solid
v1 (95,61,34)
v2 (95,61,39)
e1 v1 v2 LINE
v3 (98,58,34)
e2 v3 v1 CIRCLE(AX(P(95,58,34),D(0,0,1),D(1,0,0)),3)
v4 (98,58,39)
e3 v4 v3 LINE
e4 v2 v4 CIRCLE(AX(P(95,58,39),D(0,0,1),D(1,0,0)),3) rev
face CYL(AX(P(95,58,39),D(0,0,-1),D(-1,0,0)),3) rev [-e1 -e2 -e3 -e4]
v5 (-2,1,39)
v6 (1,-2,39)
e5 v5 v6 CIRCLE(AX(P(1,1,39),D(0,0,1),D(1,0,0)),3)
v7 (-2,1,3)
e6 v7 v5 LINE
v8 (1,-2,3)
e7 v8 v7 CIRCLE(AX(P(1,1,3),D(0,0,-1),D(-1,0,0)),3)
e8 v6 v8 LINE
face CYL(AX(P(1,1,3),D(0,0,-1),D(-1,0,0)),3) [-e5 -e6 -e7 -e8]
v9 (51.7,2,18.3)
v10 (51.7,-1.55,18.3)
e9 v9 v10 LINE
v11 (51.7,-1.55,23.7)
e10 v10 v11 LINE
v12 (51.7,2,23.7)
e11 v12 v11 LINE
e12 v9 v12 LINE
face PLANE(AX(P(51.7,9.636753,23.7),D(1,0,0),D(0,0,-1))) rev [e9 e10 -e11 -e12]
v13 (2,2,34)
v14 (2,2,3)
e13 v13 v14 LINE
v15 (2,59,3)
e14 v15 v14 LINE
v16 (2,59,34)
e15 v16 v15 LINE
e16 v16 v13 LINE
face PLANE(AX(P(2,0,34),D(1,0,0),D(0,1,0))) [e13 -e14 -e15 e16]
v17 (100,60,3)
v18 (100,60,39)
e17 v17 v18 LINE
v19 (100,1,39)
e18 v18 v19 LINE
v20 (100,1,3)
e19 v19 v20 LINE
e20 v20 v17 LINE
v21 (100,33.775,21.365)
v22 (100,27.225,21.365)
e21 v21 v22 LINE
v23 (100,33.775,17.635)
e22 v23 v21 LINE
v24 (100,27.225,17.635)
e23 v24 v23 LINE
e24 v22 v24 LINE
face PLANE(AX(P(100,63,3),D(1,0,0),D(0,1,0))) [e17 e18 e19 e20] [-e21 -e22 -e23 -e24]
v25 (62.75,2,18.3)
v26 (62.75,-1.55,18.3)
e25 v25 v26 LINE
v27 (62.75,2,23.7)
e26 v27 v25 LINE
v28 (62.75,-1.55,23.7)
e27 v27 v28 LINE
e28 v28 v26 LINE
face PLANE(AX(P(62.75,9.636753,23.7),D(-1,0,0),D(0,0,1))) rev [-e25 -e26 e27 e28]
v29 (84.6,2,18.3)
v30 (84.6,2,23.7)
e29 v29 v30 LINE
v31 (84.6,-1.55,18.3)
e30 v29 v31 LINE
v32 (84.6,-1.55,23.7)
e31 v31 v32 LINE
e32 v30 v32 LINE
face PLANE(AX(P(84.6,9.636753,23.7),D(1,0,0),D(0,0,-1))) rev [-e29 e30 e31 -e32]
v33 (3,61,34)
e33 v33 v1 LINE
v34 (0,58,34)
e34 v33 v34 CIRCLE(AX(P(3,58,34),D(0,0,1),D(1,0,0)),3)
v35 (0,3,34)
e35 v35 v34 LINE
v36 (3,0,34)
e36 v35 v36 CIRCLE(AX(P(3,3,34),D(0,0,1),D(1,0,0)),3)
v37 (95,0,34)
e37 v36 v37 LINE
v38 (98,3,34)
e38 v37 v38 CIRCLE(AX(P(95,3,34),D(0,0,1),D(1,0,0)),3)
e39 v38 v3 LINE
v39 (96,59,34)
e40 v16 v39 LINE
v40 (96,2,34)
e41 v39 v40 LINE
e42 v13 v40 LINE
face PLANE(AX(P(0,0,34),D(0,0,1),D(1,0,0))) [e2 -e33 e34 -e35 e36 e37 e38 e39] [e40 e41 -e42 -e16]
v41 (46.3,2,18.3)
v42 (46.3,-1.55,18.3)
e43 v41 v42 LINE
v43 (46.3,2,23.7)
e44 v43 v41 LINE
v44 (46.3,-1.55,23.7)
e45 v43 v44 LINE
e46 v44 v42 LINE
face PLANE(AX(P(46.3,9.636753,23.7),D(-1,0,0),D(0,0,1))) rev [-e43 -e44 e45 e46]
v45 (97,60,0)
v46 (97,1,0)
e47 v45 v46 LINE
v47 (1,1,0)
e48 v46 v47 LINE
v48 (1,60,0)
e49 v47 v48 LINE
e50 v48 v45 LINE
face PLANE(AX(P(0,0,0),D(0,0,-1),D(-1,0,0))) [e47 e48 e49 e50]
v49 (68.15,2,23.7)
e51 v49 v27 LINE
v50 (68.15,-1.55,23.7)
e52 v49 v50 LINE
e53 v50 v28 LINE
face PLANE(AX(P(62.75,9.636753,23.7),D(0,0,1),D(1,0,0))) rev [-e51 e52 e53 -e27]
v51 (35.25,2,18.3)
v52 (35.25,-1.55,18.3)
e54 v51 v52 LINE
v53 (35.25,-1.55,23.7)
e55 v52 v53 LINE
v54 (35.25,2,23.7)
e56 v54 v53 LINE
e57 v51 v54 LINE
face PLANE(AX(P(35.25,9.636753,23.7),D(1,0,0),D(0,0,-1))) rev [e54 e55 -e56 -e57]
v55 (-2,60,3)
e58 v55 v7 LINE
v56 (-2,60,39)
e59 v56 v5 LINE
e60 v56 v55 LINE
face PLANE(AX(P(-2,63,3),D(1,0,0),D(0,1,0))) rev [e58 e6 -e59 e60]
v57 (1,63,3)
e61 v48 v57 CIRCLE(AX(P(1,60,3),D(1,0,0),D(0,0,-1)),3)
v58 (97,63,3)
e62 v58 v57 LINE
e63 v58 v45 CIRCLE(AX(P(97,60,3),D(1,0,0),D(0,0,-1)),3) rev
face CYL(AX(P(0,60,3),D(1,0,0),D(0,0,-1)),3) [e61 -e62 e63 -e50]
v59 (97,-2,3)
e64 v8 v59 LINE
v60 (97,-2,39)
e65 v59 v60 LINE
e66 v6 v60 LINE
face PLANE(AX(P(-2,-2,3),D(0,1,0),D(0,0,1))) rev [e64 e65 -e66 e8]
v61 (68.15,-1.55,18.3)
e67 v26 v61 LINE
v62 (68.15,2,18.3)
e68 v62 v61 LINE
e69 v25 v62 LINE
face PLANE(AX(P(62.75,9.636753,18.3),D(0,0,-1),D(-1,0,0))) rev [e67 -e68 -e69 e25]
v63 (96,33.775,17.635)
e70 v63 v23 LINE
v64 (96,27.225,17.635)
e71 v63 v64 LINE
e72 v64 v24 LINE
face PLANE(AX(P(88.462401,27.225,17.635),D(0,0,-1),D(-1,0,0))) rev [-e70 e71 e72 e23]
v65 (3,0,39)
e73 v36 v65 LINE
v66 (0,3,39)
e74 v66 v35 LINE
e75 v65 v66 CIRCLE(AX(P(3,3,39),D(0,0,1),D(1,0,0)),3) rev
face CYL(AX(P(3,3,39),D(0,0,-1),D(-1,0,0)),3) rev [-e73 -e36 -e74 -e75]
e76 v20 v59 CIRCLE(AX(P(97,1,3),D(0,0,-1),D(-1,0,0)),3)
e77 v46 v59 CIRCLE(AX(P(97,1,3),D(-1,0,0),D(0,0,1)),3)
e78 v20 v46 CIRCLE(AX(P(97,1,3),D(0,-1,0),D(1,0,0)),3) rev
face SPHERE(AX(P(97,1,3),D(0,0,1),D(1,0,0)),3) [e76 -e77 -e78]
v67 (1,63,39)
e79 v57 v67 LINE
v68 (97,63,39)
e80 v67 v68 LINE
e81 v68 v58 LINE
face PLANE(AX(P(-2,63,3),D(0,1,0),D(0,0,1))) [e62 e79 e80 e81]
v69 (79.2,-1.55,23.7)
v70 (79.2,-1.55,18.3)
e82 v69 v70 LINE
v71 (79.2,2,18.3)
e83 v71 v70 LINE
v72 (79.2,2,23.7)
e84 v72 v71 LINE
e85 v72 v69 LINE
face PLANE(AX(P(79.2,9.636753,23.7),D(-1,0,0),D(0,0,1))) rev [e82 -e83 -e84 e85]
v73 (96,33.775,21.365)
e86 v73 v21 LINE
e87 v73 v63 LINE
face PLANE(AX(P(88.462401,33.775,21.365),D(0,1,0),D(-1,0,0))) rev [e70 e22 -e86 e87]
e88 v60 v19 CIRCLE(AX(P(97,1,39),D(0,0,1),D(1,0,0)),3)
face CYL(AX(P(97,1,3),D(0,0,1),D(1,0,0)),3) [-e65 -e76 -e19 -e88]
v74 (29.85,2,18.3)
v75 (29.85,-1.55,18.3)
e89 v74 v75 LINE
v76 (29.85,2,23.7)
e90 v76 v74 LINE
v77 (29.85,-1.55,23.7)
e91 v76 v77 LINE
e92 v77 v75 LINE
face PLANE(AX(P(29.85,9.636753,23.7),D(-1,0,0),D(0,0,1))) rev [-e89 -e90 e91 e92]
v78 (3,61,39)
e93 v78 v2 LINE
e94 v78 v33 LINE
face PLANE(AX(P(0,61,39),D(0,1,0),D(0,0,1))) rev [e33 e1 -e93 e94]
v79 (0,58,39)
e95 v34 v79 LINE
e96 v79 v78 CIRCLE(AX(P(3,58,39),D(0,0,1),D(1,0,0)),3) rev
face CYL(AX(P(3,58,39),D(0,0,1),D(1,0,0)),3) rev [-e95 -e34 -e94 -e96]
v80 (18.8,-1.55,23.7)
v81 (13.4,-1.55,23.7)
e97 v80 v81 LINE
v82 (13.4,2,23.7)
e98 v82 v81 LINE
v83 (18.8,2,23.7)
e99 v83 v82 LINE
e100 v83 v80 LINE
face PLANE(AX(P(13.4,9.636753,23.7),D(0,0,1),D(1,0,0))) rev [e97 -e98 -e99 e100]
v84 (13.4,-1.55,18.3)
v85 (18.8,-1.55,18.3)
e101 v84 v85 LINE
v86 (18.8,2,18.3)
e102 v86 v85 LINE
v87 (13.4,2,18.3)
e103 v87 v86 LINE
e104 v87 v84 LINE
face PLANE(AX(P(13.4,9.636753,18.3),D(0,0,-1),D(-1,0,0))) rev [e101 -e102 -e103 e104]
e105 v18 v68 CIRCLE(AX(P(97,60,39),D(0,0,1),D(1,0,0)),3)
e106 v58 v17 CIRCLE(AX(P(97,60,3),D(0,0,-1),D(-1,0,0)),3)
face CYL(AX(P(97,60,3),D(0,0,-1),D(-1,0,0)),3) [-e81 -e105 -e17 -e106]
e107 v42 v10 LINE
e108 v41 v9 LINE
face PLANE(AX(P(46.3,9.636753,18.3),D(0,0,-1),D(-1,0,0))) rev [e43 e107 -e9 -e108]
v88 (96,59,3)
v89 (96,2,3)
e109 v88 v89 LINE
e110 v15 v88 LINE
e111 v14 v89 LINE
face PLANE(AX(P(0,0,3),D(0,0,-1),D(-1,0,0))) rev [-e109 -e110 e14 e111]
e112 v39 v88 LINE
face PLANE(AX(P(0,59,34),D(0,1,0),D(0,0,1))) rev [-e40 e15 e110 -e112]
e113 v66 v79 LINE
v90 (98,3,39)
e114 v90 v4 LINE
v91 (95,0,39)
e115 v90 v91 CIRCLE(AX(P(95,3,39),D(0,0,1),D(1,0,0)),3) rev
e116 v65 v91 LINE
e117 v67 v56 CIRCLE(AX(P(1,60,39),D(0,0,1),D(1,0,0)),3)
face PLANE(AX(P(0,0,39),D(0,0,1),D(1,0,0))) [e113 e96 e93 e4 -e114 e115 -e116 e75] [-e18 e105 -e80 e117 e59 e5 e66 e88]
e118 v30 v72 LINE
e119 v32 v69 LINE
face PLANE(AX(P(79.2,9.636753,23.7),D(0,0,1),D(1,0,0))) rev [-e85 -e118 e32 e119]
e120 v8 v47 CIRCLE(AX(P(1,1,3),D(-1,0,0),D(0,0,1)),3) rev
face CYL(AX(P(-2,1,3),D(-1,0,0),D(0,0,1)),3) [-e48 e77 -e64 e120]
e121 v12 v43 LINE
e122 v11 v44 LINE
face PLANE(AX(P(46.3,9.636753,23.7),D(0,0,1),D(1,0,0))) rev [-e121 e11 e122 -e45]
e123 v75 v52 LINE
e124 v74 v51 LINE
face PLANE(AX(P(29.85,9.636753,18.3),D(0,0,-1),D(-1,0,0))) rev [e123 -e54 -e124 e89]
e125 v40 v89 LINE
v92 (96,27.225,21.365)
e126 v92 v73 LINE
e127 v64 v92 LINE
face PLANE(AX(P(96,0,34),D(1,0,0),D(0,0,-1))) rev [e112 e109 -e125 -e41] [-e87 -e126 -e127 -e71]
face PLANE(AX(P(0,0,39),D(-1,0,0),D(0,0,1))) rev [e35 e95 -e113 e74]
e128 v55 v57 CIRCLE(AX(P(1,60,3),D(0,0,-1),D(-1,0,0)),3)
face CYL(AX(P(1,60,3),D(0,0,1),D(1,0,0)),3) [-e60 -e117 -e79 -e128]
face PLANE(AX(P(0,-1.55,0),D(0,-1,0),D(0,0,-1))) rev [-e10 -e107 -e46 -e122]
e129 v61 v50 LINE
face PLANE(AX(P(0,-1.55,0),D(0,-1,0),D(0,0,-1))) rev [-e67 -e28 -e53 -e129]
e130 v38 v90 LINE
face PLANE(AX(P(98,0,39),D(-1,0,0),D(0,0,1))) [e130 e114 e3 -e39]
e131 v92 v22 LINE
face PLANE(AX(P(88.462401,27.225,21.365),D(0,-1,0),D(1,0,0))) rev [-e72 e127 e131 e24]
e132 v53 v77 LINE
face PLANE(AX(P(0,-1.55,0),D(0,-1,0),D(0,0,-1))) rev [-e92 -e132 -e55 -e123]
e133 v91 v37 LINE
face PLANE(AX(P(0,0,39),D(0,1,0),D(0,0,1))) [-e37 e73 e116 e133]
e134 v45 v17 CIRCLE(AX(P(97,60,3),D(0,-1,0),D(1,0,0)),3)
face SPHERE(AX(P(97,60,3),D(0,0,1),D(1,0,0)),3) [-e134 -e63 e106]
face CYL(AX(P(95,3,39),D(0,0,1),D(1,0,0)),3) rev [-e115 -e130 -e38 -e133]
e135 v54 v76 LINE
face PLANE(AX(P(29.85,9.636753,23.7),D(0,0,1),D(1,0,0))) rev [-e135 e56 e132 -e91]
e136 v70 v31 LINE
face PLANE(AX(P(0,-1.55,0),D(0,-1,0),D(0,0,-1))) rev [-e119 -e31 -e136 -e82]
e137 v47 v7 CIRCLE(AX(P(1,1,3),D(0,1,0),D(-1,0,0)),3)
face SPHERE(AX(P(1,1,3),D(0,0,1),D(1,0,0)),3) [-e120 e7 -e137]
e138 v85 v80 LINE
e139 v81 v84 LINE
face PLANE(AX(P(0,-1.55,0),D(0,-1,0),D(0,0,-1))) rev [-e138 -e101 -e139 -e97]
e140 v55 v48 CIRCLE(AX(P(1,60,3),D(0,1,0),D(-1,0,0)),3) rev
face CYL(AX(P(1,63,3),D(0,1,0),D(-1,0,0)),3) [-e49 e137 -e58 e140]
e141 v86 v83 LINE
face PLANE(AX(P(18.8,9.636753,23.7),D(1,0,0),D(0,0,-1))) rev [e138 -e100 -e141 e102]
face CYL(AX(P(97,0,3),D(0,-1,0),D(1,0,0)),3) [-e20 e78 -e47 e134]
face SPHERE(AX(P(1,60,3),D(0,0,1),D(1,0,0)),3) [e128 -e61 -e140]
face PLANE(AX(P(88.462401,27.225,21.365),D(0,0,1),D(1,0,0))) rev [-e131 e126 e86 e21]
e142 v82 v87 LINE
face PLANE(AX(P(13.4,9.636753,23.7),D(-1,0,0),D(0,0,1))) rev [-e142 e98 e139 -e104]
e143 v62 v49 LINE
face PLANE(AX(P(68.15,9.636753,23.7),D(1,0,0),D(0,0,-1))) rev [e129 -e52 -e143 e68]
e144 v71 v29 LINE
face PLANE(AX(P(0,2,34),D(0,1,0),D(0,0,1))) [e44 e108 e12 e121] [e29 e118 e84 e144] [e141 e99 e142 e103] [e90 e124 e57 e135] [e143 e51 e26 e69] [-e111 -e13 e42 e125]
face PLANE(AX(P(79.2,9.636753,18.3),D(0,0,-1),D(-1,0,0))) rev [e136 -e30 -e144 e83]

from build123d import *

# Parameters (mm, degrees)
SKICA1_W                 = 102
SKICA1_H                 = 65
P_IDAT_VYSUNUT_M1_DEPTH  = 3
SKICA1_4_W               = 102
SKICA1_4_H               = 65
SKICA1_4_W_2             = 98
SKICA1_4_H_2             = 61
P_IDAT_VYSUNUT_M2_DEPTH  = 39
SKICA1_5_W               = 98
SKICA1_5_H               = 61
SKICA1_5_W_2             = 94
SKICA1_5_H_2             = 57
P_IDAT_VYSUNUT_M3_DEPTH  = 34
SKICA2_W                 = 3.73
SKICA2_H                 = 6.55
ODEBRAT_VYSUNUT_M1_DEPTH = 4
ZAOBLIT1_R               = 3
ZAOBLIT2_R               = 3
ODEBRAT_START            = -0.45
SKICA4_W                 = 5.4
SKICA4_H                 = 5.4
ODEBRAT_VYSUNUT_M2_DEPTH = 3.55
ZAOBLIT3_R               = 3


with BuildPart() as part:
    # Skica1 → Přidat vysunutím1 (new body)
    with BuildSketch(Plane.XY):
        with Locations((49, 30.5)):
            Rectangle(SKICA1_W, SKICA1_H)
    extrude(amount=P_IDAT_VYSUNUT_M1_DEPTH)

    # Skica1<4> → Přidat vysunutím2 (add)
    with BuildSketch(Plane.XY):
        with Locations((49, 30.5)):
            Rectangle(SKICA1_4_W, SKICA1_4_H)
        with Locations((49, 30.5)):
            Rectangle(SKICA1_4_W_2, SKICA1_4_H_2, mode=Mode.SUBTRACT)
    extrude(amount=P_IDAT_VYSUNUT_M2_DEPTH)

    # Skica1<5> → Přidat vysunutím3 (add)
    with BuildSketch(Plane.XY):
        with Locations((49, 30.5)):
            Rectangle(SKICA1_5_W, SKICA1_5_H)
        with Locations((49, 30.5)):
            Rectangle(SKICA1_5_W_2, SKICA1_5_H_2, mode=Mode.SUBTRACT)
    extrude(amount=P_IDAT_VYSUNUT_M3_DEPTH)

    # Skica2 → Odebrat vysunutím1 (cut)
    with BuildSketch(Plane(origin=(100, 0, 0), x_dir=(0, 0, -1), z_dir=(1, 0, 0))):
        with Locations((-19.5, 30.5)):
            Rectangle(SKICA2_W, SKICA2_H)
    extrude(amount=-ODEBRAT_VYSUNUT_M1_DEPTH, mode=Mode.SUBTRACT)

    # Zaoblit1
    zaoblit1_edges = [part.edges().sort_by_distance(p)[0] for p in [
        (-2, 30.5, 0),
        (49, -2, 0),
        (100, 30.5, 0),
        (49, 63, 0),
    ]]
    fillet(zaoblit1_edges, radius=ZAOBLIT1_R)

    # Zaoblit2
    # the kernel refuses this fillet: 3 mm, written as the material it takes off along each edge
    with BuildSketch(Plane(origin=(97, 60, 3), x_dir=(1, 0, 0), z_dir=(0, 1, 0))) as zaoblit2_piece_1_section:
        Polygon((0, 0), (ZAOBLIT2_R, 0), (ZAOBLIT2_R, ZAOBLIT2_R), (0, ZAOBLIT2_R), align=None)
    zaoblit2_piece_1 = extrude(amount=ZAOBLIT2_R, mode=Mode.PRIVATE)
    zaoblit2_piece_1 = zaoblit2_piece_1 - Plane(origin=(97, 60, 3), x_dir=(-0.7071067811865475, 0, 0.7071067811865475), z_dir=(0, 1, 0)) * Sphere(ZAOBLIT2_R, mode=Mode.PRIVATE)
    add(zaoblit2_piece_1, mode=Mode.SUBTRACT)
    with BuildSketch(Plane(origin=(97, 1, 3), x_dir=(0, -1, 0), z_dir=(1, 0, 0))) as zaoblit2_piece_2_section:
        Polygon((0, 0), (ZAOBLIT2_R, 0), (ZAOBLIT2_R, ZAOBLIT2_R), (0, ZAOBLIT2_R), align=None)
    zaoblit2_piece_2 = extrude(amount=ZAOBLIT2_R, mode=Mode.PRIVATE)
    zaoblit2_piece_2 = zaoblit2_piece_2 - Plane(origin=(97, 1, 3), x_dir=(0, 0.7071067811865475, 0.7071067811865475), z_dir=(1, 0, 0)) * Sphere(ZAOBLIT2_R, mode=Mode.PRIVATE)
    add(zaoblit2_piece_2, mode=Mode.SUBTRACT)
    with BuildSketch(Plane(origin=(1, 60, 3), x_dir=(-1, 0, 0), z_dir=(0, 1, 0))) as zaoblit2_piece_3_section:
        Polygon((0, 0), (ZAOBLIT2_R, 0), (ZAOBLIT2_R, -ZAOBLIT2_R), (0, -ZAOBLIT2_R), align=None)
    zaoblit2_piece_3 = extrude(amount=ZAOBLIT2_R, mode=Mode.PRIVATE)
    zaoblit2_piece_3 = zaoblit2_piece_3 - Plane(origin=(1, 60, 3), x_dir=(0.7071067811865475, 0, 0.7071067811865475), z_dir=(0, 1, 0)) * Sphere(ZAOBLIT2_R, mode=Mode.PRIVATE)
    add(zaoblit2_piece_3, mode=Mode.SUBTRACT)
    with BuildSketch(Plane(origin=(1, 1, 3), x_dir=(0, -1, 0), z_dir=(-1, 0, 0))) as zaoblit2_piece_4_section:
        Polygon((0, 0), (ZAOBLIT2_R, 0), (ZAOBLIT2_R, -ZAOBLIT2_R), (0, -ZAOBLIT2_R), align=None)
    zaoblit2_piece_4 = extrude(amount=ZAOBLIT2_R, mode=Mode.PRIVATE)
    zaoblit2_piece_4 = zaoblit2_piece_4 - Plane(origin=(1, 1, 3), x_dir=(0, 0.7071067811865475, 0.7071067811865475), z_dir=(-1, 0, 0)) * Sphere(ZAOBLIT2_R, mode=Mode.PRIVATE)
    add(zaoblit2_piece_4, mode=Mode.SUBTRACT)
    with BuildSketch(Plane(origin=(-2, 63, 3), x_dir=(1, 0, 0), z_dir=(0, 0, 1)), Plane(origin=(-2, -2, 3), x_dir=(0, 1, 0), z_dir=(0, 0, 1)), Plane(origin=(100, -2, 46.5), x_dir=(0, 1, 0), z_dir=(0, 0, -1)), Plane(origin=(100, 63, 46.5), x_dir=(-1, 0, 0), z_dir=(0, 0, -1))) as zaoblit2_piece_5:
        with BuildLine():
            CenterArc((ZAOBLIT2_R, -ZAOBLIT2_R), ZAOBLIT2_R, 90, 90)
            Line((0, -ZAOBLIT2_R), (0, 0))
            Line((0, 0), (ZAOBLIT2_R, 0))
        make_face()
    extrude(amount=43.5, mode=Mode.SUBTRACT)

    # Skica4 → Odebrat vysunutím2 (cut)
    with BuildSketch(Plane.XZ.offset(2).offset(ODEBRAT_START)):
        with Locations((16.1, 21)):
            Rectangle(SKICA4_W, SKICA4_H)
        with Locations((32.55, 21)):
            Rectangle(SKICA4_W, SKICA4_H)
        with Locations((49, 21)):
            Rectangle(SKICA4_W, SKICA4_H)
        with Locations((65.45, 21)):
            Rectangle(SKICA4_W, SKICA4_H)
        with Locations((81.9, 21)):
            Rectangle(SKICA4_W, SKICA4_H)
    extrude(amount=-ODEBRAT_VYSUNUT_M2_DEPTH, mode=Mode.SUBTRACT)

    # Zaoblit3
    zaoblit3_edges = [part.edges().sort_by_distance(p)[0] for p in [
        (98, 61, 36.5),
        (98, 0, 36.5),
        (0, 0, 36.5),
        (0, 61, 36.5),
    ]]
    fillet(zaoblit3_edges, radius=ZAOBLIT3_R)


solid = part.part
